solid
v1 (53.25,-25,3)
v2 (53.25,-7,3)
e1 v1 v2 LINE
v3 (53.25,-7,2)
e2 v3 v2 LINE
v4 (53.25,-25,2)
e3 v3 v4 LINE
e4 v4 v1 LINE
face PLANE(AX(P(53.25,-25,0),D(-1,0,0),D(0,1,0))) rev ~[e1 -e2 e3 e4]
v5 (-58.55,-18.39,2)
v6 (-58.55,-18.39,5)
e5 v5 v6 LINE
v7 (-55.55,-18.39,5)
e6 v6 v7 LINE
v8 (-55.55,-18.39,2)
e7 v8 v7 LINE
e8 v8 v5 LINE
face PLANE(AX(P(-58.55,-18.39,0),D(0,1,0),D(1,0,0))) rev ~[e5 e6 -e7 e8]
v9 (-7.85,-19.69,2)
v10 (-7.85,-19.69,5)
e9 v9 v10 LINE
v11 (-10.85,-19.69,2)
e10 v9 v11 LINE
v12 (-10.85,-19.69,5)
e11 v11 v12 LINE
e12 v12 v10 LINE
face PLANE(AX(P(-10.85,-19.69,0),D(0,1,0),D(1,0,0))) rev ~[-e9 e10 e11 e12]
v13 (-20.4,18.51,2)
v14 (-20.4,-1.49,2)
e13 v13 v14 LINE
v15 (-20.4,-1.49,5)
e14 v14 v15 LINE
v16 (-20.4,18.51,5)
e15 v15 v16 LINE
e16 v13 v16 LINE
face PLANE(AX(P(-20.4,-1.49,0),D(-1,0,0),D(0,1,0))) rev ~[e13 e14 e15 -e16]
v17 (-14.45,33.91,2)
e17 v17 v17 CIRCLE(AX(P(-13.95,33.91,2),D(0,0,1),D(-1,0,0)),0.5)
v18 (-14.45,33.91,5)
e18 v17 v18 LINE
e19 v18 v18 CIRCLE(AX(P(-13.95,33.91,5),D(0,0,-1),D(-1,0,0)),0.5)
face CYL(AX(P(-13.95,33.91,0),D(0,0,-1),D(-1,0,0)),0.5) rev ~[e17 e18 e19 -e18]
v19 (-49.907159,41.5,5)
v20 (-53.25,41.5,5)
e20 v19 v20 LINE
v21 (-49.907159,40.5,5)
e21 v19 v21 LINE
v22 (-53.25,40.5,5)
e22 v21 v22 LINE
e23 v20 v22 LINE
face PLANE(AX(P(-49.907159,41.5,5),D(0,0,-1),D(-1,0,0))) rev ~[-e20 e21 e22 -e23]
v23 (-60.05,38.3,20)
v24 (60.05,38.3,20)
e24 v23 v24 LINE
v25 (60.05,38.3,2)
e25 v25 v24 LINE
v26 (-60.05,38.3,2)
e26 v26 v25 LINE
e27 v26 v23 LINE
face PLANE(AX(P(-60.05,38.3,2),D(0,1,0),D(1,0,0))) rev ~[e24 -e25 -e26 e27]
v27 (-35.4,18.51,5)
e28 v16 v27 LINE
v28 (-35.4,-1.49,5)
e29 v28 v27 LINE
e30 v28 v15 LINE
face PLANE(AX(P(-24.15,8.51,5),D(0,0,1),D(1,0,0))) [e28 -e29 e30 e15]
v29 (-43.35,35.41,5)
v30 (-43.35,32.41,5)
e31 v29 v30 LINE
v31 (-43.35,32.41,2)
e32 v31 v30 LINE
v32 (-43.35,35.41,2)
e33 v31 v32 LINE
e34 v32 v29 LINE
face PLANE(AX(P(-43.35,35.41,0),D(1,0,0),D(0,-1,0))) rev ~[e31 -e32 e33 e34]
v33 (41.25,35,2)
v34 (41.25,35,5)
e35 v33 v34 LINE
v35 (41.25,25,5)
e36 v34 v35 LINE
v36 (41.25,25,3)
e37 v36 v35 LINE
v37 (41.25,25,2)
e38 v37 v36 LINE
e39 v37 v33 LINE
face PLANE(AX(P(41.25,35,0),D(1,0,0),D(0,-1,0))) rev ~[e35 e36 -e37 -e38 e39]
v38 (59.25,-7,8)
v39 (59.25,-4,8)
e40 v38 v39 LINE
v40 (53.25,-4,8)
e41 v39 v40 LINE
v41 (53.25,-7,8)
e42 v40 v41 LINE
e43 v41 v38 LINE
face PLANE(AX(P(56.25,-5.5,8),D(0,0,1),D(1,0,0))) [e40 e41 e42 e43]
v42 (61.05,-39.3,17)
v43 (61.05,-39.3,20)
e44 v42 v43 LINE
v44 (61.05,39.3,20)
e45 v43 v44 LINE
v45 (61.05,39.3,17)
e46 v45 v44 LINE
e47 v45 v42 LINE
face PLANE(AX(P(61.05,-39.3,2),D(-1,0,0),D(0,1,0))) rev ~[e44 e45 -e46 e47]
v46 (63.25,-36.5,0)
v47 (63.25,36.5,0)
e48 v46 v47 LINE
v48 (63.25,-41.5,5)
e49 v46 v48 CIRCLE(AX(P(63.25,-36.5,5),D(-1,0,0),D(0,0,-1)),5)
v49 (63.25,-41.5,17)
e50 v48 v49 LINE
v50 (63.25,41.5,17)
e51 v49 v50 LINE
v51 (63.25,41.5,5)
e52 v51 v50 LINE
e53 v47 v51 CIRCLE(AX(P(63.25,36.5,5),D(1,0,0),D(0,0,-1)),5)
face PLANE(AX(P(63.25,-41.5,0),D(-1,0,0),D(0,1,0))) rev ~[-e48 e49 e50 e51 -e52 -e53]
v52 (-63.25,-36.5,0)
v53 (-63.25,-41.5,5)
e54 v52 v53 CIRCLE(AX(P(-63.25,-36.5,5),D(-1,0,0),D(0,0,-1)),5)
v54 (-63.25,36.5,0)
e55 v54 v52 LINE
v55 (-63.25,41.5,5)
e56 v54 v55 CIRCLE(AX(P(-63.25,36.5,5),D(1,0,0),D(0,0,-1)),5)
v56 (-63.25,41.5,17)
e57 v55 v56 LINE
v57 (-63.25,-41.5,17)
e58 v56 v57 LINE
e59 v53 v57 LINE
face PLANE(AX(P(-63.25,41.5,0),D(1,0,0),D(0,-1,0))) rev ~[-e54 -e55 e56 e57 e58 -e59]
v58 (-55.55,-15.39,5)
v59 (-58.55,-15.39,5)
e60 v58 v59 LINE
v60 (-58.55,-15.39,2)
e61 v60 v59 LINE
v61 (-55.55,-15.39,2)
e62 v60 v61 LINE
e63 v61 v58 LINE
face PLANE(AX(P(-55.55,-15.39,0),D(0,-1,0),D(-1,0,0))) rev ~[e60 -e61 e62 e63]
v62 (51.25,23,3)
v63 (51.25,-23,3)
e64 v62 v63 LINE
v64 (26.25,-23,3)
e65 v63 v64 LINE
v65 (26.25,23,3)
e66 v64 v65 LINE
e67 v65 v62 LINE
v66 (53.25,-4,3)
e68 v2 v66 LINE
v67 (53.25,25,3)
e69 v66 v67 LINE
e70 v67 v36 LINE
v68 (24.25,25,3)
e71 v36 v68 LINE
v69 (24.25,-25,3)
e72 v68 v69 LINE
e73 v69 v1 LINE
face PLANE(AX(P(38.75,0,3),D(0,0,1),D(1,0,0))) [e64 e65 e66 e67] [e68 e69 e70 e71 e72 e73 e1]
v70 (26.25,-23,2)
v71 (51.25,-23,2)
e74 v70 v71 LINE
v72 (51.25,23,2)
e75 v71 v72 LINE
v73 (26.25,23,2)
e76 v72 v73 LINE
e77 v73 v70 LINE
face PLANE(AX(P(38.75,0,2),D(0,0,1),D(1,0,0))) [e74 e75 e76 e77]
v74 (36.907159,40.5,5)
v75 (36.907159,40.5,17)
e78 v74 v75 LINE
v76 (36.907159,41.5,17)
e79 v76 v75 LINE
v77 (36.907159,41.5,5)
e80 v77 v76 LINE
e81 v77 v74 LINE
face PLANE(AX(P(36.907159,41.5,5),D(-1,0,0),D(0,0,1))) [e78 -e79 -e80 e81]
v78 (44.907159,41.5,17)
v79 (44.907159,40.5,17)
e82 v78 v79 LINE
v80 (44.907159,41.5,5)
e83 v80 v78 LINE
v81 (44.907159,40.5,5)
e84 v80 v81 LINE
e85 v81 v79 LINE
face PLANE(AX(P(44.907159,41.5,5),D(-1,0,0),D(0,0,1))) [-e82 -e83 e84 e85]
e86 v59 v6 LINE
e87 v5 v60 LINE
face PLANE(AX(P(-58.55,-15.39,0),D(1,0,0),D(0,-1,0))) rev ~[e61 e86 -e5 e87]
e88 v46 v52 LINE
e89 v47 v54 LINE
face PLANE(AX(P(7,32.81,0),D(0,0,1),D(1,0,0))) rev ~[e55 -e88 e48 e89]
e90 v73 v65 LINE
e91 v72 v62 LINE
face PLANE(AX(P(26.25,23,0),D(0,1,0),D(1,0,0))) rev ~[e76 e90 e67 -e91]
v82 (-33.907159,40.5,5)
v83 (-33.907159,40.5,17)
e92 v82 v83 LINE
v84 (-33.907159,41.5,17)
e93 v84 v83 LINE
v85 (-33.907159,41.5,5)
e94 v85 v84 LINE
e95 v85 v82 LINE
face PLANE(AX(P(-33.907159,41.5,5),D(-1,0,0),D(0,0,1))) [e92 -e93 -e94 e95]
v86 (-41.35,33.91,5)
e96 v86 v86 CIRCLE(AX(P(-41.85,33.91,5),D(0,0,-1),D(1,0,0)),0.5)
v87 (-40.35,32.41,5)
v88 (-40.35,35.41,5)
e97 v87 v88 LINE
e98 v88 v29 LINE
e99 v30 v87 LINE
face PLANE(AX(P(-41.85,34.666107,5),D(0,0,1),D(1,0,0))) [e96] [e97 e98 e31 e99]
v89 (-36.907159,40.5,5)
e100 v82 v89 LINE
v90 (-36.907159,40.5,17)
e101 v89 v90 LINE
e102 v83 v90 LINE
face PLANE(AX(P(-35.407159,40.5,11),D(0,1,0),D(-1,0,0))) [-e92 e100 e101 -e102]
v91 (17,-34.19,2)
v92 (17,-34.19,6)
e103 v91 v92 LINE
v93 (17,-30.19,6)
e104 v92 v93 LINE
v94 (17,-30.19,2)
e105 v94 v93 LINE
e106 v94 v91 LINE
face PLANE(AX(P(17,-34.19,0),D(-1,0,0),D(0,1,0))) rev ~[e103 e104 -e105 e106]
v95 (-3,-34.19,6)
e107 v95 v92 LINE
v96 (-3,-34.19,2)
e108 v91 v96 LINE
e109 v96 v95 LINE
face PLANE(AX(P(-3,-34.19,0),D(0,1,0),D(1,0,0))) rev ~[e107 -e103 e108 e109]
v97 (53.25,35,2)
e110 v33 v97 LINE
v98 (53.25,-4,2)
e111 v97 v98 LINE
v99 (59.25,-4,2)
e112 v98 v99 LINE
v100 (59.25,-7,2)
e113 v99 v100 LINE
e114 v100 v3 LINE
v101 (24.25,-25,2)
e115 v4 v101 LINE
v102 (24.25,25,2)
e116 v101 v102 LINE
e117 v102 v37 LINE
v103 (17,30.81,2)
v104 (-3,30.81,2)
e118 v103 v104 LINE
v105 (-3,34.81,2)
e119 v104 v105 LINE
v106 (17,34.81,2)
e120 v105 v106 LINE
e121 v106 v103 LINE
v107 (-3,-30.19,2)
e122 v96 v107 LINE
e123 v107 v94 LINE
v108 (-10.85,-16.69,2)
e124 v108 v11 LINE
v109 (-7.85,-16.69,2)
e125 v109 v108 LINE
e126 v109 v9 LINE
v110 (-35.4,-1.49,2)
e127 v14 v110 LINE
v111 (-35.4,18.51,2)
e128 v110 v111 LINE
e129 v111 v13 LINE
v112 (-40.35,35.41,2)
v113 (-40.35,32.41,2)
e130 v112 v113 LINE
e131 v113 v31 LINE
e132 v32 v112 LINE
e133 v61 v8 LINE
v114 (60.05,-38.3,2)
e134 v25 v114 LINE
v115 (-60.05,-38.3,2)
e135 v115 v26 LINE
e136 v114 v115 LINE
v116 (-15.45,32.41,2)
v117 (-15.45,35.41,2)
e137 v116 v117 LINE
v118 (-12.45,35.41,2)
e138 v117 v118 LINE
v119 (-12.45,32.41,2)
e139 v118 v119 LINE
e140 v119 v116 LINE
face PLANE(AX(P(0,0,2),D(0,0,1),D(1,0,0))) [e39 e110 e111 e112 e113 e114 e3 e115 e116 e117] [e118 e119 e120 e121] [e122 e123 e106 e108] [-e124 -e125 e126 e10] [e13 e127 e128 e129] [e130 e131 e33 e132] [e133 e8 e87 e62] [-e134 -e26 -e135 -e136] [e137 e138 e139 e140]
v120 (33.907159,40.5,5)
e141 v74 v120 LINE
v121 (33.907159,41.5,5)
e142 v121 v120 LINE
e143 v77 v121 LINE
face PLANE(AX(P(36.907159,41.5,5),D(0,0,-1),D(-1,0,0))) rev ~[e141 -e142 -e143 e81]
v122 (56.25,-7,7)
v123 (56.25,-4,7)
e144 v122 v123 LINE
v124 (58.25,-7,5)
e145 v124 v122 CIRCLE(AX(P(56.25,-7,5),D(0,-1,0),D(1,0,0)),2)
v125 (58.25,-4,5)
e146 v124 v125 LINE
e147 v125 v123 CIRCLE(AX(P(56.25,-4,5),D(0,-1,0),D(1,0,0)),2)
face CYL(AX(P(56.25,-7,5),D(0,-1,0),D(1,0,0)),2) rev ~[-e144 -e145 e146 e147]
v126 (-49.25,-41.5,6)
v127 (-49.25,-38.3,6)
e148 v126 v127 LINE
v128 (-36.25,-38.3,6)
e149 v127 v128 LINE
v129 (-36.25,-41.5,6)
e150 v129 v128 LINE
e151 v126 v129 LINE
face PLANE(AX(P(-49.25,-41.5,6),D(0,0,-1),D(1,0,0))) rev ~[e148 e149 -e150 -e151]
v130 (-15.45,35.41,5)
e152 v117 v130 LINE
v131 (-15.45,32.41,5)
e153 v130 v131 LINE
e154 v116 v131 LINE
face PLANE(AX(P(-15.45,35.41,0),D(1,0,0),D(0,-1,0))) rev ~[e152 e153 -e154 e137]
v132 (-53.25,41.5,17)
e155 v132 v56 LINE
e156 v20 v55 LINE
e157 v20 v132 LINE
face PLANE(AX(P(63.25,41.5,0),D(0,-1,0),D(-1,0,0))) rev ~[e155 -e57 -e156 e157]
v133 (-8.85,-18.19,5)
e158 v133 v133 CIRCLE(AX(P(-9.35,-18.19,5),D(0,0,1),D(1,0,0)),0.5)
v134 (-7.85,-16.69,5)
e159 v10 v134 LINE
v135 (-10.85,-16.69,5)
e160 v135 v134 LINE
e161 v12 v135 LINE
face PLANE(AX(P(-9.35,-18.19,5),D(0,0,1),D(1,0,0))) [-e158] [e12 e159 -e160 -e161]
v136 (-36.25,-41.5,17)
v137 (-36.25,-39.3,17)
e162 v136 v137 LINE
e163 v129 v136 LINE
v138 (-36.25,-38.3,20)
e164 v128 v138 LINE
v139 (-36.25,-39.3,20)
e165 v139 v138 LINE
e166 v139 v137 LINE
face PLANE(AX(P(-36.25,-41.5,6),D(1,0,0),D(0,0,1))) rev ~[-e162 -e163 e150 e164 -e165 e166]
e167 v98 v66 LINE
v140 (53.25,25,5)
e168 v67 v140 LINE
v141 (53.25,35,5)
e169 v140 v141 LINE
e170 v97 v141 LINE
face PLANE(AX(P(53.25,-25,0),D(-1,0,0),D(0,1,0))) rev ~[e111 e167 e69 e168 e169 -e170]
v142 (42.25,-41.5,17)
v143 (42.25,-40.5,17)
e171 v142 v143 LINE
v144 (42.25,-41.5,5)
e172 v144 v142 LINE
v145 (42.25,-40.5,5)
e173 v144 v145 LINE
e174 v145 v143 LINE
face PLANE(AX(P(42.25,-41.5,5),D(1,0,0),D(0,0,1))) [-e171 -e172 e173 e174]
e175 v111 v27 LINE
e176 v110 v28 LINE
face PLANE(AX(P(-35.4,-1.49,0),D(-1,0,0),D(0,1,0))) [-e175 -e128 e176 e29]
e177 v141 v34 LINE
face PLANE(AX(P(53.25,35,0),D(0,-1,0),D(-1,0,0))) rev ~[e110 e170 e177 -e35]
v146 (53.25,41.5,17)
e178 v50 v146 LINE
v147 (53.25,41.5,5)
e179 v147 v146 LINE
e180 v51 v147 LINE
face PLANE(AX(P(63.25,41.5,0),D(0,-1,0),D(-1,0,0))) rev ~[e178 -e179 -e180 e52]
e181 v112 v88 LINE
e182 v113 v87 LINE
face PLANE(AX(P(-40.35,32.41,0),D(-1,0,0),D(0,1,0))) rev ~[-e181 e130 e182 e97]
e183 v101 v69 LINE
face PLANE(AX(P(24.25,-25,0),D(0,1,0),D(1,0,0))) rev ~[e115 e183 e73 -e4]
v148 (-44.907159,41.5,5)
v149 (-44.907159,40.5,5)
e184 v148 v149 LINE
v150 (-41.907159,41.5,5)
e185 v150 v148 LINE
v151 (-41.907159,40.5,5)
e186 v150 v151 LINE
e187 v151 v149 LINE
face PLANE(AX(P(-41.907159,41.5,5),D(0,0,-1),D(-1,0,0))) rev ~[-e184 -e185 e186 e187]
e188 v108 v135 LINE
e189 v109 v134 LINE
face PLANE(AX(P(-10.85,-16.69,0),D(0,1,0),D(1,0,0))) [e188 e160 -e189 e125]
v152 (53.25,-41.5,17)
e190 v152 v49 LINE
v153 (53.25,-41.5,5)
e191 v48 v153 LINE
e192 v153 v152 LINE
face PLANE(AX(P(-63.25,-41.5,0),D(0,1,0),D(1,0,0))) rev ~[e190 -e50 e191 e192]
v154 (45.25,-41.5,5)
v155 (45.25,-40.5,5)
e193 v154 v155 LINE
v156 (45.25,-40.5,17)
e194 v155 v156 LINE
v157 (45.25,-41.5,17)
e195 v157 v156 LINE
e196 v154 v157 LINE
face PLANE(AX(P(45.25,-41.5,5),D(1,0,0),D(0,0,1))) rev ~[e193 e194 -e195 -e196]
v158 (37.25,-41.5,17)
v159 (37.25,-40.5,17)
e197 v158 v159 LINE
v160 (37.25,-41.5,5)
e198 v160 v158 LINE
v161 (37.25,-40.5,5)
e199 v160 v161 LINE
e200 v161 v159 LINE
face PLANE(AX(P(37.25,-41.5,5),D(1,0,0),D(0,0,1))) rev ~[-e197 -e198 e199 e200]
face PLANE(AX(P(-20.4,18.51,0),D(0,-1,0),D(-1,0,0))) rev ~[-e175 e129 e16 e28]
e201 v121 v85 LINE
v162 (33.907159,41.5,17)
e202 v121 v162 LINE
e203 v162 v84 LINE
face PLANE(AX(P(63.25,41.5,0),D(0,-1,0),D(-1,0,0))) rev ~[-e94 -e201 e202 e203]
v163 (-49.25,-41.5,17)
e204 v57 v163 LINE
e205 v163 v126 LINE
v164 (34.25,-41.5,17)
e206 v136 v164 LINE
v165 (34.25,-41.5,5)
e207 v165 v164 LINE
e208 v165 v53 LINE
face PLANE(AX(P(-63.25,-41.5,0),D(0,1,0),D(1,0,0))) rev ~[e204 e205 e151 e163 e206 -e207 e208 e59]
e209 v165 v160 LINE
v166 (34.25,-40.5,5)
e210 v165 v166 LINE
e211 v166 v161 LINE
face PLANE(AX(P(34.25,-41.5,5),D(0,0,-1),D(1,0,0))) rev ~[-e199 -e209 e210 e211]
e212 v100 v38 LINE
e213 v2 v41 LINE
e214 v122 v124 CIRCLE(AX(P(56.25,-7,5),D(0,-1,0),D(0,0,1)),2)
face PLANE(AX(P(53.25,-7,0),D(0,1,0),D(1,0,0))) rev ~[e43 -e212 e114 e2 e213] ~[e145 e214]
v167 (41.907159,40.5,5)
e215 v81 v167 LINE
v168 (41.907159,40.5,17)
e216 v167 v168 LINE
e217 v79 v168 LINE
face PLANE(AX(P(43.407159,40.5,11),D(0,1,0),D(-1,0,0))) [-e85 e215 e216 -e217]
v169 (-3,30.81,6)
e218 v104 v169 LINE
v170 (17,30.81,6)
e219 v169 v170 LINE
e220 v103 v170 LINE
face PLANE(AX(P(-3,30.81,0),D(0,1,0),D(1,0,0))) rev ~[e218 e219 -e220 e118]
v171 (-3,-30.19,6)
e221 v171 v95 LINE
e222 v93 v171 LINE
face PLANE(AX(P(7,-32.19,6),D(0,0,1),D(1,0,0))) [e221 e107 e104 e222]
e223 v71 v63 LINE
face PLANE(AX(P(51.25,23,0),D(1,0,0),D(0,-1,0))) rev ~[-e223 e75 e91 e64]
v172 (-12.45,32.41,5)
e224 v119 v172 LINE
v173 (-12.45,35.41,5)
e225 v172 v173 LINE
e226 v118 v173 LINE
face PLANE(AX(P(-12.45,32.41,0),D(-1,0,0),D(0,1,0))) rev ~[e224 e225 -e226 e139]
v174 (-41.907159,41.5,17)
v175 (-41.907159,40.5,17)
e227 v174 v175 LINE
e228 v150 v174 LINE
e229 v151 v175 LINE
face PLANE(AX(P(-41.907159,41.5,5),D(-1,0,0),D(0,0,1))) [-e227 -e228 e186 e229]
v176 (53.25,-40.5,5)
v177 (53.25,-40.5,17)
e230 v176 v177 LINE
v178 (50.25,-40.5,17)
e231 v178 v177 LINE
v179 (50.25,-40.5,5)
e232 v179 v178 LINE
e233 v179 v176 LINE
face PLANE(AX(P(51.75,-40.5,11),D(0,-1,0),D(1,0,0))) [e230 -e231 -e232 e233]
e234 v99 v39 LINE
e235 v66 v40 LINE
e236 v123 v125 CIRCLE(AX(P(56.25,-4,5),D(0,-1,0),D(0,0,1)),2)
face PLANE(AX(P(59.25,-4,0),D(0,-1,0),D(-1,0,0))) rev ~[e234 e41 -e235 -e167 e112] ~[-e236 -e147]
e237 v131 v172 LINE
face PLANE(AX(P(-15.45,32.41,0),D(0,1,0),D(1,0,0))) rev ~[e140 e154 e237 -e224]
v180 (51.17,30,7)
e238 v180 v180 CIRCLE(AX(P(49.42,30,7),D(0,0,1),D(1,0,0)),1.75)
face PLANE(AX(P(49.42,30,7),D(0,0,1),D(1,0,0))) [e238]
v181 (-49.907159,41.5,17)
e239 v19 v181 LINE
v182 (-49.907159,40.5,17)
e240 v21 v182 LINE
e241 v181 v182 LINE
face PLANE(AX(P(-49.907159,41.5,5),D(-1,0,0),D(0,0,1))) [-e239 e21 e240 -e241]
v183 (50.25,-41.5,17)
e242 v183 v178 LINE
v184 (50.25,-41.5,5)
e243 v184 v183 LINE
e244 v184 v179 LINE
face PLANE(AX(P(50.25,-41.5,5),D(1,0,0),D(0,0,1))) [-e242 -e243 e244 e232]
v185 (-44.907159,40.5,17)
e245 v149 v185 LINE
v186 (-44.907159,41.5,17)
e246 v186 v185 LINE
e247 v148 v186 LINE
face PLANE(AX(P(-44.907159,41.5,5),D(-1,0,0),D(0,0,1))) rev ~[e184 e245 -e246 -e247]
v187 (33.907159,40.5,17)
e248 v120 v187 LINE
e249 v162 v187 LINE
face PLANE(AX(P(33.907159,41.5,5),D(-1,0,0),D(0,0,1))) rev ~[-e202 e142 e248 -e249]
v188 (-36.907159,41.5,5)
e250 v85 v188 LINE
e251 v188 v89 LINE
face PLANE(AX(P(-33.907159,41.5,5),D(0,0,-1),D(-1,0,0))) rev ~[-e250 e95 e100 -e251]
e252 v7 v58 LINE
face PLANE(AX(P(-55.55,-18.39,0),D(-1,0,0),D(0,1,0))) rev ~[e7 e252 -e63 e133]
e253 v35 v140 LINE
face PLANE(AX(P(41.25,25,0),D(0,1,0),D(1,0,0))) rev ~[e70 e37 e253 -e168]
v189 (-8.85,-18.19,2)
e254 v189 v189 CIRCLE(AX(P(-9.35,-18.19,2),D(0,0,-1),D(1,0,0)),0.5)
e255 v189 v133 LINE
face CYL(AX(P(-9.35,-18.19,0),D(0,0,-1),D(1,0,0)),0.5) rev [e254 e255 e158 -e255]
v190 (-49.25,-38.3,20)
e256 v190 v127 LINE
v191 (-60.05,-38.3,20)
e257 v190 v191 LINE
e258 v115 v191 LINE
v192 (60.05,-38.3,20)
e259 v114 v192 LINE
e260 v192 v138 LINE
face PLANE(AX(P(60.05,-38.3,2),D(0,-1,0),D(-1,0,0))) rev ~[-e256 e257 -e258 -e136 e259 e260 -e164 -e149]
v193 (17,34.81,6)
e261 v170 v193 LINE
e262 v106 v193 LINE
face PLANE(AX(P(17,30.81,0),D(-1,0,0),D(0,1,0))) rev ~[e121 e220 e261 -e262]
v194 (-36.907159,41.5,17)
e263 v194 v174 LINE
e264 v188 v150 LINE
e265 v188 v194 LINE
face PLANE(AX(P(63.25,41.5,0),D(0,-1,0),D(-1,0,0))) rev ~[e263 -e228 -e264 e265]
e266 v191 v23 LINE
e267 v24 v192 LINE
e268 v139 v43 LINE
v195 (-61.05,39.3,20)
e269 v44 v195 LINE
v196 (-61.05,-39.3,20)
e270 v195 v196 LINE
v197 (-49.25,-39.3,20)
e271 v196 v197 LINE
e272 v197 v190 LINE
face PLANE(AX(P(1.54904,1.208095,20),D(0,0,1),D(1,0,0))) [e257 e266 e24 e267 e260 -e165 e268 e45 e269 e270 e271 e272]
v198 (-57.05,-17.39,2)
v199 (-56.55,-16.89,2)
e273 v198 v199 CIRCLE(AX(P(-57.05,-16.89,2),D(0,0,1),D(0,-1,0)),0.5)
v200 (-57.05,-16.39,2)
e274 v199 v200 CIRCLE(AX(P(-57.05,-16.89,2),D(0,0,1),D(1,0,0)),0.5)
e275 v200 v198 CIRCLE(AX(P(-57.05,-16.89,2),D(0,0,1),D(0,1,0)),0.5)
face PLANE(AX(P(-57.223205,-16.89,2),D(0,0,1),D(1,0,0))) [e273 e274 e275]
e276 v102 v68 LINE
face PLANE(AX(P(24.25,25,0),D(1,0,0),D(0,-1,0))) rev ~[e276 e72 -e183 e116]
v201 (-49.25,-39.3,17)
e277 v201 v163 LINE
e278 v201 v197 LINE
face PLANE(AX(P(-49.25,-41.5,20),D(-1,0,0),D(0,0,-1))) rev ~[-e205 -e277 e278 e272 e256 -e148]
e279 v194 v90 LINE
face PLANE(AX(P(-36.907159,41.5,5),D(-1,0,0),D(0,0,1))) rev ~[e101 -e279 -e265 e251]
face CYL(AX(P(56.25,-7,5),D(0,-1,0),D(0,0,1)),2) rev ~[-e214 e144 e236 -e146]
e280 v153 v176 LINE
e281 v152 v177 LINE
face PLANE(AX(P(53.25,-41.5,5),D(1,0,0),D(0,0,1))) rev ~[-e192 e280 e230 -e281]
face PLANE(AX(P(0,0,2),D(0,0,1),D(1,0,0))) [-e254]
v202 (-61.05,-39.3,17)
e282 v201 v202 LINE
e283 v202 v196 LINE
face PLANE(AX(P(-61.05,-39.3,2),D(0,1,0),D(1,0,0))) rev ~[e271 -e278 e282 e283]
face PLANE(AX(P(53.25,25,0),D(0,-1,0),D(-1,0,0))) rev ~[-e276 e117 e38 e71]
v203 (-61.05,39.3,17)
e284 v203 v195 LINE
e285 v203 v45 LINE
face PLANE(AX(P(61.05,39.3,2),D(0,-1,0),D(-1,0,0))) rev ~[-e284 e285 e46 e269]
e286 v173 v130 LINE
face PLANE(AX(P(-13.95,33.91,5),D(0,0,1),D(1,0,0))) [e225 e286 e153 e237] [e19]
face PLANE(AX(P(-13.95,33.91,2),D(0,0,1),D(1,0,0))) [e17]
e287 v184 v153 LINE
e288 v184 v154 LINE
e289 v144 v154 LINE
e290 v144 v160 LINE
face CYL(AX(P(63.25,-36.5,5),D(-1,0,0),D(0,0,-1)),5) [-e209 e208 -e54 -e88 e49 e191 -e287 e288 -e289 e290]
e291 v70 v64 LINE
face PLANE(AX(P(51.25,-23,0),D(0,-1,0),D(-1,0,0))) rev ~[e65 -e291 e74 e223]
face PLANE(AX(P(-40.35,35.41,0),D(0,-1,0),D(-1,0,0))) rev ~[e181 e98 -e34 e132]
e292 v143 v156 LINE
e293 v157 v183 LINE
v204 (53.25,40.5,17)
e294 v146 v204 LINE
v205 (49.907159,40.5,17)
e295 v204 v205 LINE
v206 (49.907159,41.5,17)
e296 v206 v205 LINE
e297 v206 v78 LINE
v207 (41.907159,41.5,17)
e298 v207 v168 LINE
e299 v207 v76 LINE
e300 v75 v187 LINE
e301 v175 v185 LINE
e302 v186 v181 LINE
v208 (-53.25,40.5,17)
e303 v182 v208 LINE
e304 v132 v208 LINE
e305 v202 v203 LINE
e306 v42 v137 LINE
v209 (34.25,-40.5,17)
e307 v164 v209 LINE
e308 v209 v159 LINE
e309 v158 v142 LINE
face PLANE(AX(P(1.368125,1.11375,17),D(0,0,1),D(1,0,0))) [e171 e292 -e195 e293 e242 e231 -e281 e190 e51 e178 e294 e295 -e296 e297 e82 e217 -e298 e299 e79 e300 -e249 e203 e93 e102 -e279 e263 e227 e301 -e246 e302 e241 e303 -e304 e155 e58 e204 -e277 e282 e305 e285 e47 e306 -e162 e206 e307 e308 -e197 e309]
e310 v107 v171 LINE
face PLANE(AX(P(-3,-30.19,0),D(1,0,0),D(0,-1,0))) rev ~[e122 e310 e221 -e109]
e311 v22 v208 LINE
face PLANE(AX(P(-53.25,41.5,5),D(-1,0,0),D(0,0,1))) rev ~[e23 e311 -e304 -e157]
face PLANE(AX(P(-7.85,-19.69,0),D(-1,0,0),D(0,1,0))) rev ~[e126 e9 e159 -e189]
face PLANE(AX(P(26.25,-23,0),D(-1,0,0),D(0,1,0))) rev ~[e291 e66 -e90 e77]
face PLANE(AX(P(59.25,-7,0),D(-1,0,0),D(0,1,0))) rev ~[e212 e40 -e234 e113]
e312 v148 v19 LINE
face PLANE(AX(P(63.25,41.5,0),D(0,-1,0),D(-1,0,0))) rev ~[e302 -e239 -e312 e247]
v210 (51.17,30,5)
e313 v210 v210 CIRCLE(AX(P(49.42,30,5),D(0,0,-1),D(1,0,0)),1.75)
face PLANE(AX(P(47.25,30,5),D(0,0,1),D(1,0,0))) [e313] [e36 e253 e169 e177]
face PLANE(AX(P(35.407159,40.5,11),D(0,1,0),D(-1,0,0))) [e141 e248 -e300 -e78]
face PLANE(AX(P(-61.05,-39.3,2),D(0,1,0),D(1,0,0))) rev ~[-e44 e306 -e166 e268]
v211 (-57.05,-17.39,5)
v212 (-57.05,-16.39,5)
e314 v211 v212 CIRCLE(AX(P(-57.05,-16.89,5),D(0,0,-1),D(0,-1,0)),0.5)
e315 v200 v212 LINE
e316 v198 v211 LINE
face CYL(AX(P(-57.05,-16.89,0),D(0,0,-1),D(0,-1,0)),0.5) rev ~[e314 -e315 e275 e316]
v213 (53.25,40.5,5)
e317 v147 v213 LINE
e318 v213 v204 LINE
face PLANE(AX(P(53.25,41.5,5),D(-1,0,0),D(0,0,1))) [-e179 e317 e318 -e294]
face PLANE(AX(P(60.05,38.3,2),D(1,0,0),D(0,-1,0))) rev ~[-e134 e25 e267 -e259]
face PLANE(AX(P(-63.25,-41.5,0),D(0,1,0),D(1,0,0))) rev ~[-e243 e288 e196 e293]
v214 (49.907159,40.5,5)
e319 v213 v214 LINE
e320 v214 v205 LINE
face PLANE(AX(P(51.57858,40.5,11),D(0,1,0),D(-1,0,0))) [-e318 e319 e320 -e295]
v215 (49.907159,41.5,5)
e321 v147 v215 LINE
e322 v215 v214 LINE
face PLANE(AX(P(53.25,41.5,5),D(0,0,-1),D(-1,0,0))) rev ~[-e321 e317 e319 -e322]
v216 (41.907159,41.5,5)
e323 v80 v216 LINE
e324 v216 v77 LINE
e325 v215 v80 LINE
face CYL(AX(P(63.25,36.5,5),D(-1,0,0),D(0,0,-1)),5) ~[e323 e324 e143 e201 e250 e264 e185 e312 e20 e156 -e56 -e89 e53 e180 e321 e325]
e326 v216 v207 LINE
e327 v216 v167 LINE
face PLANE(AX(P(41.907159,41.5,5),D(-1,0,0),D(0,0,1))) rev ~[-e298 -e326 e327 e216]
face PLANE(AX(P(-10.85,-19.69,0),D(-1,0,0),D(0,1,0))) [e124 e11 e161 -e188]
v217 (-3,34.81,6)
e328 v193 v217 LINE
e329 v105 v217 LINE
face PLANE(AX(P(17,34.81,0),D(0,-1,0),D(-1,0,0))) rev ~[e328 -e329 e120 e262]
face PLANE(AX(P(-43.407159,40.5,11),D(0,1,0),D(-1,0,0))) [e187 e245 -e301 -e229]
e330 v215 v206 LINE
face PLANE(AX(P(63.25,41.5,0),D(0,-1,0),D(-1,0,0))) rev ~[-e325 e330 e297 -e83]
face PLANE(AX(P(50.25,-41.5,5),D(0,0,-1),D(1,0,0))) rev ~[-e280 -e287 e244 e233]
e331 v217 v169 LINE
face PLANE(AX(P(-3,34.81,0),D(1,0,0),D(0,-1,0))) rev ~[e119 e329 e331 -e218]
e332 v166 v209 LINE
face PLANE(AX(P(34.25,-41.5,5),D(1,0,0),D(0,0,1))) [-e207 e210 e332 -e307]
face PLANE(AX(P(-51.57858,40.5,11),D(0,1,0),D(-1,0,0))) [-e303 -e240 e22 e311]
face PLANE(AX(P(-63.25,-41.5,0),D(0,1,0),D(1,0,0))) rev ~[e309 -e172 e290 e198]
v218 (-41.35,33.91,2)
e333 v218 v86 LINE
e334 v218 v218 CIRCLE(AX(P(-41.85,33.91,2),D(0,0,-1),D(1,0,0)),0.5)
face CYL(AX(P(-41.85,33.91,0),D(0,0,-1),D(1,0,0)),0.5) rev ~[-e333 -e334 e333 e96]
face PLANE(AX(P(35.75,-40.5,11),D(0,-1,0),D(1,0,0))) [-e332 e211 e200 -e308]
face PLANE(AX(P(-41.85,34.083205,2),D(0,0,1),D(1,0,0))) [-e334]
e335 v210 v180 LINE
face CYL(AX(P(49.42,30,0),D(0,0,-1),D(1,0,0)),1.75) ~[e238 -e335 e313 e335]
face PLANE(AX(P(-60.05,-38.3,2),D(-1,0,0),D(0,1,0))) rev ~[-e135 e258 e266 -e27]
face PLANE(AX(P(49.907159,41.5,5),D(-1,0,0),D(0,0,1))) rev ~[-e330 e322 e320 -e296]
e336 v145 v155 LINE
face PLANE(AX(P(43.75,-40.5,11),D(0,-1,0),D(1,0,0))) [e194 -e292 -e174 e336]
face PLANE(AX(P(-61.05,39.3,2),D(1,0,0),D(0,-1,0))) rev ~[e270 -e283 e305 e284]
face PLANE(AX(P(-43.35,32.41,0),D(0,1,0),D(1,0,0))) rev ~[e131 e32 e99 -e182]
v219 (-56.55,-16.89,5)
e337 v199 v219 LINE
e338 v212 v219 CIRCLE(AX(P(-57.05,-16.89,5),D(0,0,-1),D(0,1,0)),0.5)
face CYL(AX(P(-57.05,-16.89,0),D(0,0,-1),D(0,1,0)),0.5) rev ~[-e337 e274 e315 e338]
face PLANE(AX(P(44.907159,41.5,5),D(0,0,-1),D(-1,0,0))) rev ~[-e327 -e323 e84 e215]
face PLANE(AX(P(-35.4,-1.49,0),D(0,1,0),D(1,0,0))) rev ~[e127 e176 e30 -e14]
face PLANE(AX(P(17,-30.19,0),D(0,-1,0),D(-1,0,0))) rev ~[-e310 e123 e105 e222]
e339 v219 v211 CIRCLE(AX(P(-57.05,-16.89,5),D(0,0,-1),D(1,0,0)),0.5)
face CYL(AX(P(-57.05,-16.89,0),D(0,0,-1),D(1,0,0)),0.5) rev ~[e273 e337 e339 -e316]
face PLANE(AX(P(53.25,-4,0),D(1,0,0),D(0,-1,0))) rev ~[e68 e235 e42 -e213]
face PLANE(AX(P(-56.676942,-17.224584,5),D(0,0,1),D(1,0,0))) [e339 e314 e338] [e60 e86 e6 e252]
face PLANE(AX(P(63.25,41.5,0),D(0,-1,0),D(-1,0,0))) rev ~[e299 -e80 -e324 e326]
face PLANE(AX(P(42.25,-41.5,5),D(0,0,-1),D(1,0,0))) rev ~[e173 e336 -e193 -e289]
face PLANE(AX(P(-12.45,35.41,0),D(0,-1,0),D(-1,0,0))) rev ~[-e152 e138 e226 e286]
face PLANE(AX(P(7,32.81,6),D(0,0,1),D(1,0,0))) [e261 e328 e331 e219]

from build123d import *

# Parameters (mm, degrees)
F0_W      = 13
F0_H      = 0.2
F0_H_2    = 2
F1_DEPTH  = 17
F0_W_2    = 3
F0_H_3    = 3
F0_R      = 1.75
F0_H_4    = 1
F0_R_2    = 0.5
F2_DEPTH  = 2
F3_R      = 5
F5_DEPTH  = 3
F6_START  = 2
F6_DEPTH  = 18
F0_W_3    = 7.5
F0_H_5    = 20
F7_DEPTH  = 5
F8_W      = 13
F8_H      = 11
F8_H_2    = 3
F9_DEPTH  = 4
F8_W_2    = 3
F8_H_3    = 12
F10_DEPTH = 1
F4_W      = 3.3428409398
F4_H      = 12
F4_W_2    = 3
F11_DEPTH = 1
F12_DEPTH = 8
F13_DEPTH = 7
F14_DEPTH = 6
F16_DEPTH = 3


# Not quite as in the source:
# - a feature names something its author has since deleted; it is built from what else it names


with BuildPart() as f1:
    # F0 (on Top) → F1 (new body)
    with BuildSketch(Plane.XY):
        Polygon((63.25, -41.5), (63.25, 41.5), (11.25, 41.5), (-63.25, 41.5), (-63.25, -41.5), (-56.25, -41.5), (-56.25, -39.5), (-61.25, -39.5), (-61.25, 39.5), (61.25, 39.5), (61.25, -39.5), (-43.25, -39.5), (-43.25, -41.5), align=None)
        Polygon((-43.25, -39.3), (-43.25, -39.5), (61.25, -39.5), (61.25, 39.5), (-61.25, 39.5), (-61.25, -39.5), (-56.25, -39.5), (-56.25, -39.3), (-61.05, -39.3), (-61.05, 39.3), (61.05, 39.3), (61.05, -39.3), (-2.75, -39.3), align=None)
        with Locations((-49.75, -39.4)):
            Rectangle(F0_W, F0_H)
        with Locations((-49.75, -40.5)):
            Rectangle(F0_W, F0_H_2)
    extrude(amount=F1_DEPTH)

    # F0 (on Top) → F2 (join)
    with BuildSketch(Plane.XY):
        Polygon((-56.25, -38.3), (-43.25, -38.3), (60.05, -38.3), (60.05, 38.3), (-60.05, 38.3), (-60.05, -18.19), (-60.05, -38.3), align=None)
        Polygon((-58.55, -18.39), (-58.55, -18.19), (-58.55, -15.39), (-57.05, -15.39), (-55.55, -15.39), (-55.55, -18.39), align=None, mode=Mode.SUBTRACT)
        with Locations((-9.35, -18.19)):
            Rectangle(F0_W_2, F0_H_3, mode=Mode.SUBTRACT)
        Polygon((17, -30.19), (17, -34.19), (-3, -34.19), (-3, -30.19), (1, -30.19), (15, -30.19), align=None, mode=Mode.SUBTRACT)
        Polygon((-35.4, 18.51), (-27.9, 18.51), (-20.4, 18.51), (-20.4, -1.49), (-27.9, -1.49), (-35.4, -1.49), align=None, mode=Mode.SUBTRACT)
        Polygon((-43.35, 32.41), (-43.35, 33.91), (-43.35, 35.41), (-40.35, 35.41), (-40.35, 33.91), (-40.35, 32.41), align=None, mode=Mode.SUBTRACT)
        Polygon((-15.45, 32.41), (-15.45, 33.91), (-15.45, 35.41), (-12.45, 35.41), (-12.45, 32.41), align=None, mode=Mode.SUBTRACT)
        Polygon((51.25, -25), (24.25, -25), (24.25, 25), (36.25, 25), (41.25, 25), (41.25, 35), (53.25, 35), (53.25, 30), (53.25, 25), (53.25, -4), (57.25, -4), (59.25, -4), (59.25, -7), (57.25, -7), (53.25, -7), (53.25, -25), align=None, mode=Mode.SUBTRACT)
        Polygon((-3, 30.81), (-3, 34.81), (17, 34.81), (17, 30.81), (15, 30.81), (1, 30.81), align=None, mode=Mode.SUBTRACT)
        Polygon((-43.25, -38.3), (-43.25, -39.3), (-2.75, -39.3), (61.05, -39.3), (61.05, 39.3), (-61.05, 39.3), (-61.05, -39.3), (-56.25, -39.3), (-56.25, -38.3), (-60.05, -38.3), (-60.05, -18.19), (-60.05, 38.3), (60.05, 38.3), (60.05, -38.3), align=None)
        Polygon((41.25, 35), (41.25, 25), (51.25, 25), (53.25, 25), (53.25, 30), (53.25, 35), align=None)
        with Locations((49.42, 30)):
            Circle(F0_R, mode=Mode.SUBTRACT)
        Polygon((17, 34.81), (-3, 34.81), (-3, 30.81), (1, 30.81), (15, 30.81), (17, 30.81), align=None)
        with Locations((-49.75, -40.5)):
            Rectangle(F0_W, F0_H_2)
        Polygon((53.25, -4), (53.25, -7), (57.25, -7), (59.25, -7), (59.25, -4), (57.25, -4), align=None)
        with Locations((-49.75, -38.8)):
            Rectangle(F0_W, F0_H_4)
        with Locations((49.42, 30)):
            Circle(F0_R)
        with Locations((-9.35, -18.19)):
            Rectangle(F0_W_2, F0_H_3)
        with Locations((-9.35, -18.19)):
            Circle(F0_R_2, mode=Mode.SUBTRACT)
        with Locations((-49.75, -39.4)):
            Rectangle(F0_W, F0_H)
        with Locations((-9.35, -18.19)):
            Circle(F0_R_2)
    extrude(amount=F2_DEPTH)

    # F3
    f3_edges = [f1.edges().sort_by_distance(p)[0] for p in [
        (0, 41.5, 0),
        (0, -41.5, 0),
    ]]
    fillet(f3_edges, radius=F3_R)



with BuildPart() as f2:
    # F0 (on Top) → F2, piece 2 (new body)
    with BuildSketch(Plane.XY):
        with BuildLine():
            ThreePointArc((-57.05, -16.39), (-57.55, -16.89), (-57.05, -17.39))
            Line((-57.05, -17.39), (-57.05, -16.89))
            Line((-57.05, -16.89), (-57.05, -16.39))
        make_face()
        with BuildLine():
            Line((-57.05, -16.89), (-57.05, -17.39))
            ThreePointArc((-57.05, -17.39), (-56.6964466094, -17.2435533906), (-56.55, -16.89))
            ThreePointArc((-56.55, -16.89), (-56.6964466094, -16.5364466094), (-57.05, -16.39))
            Line((-57.05, -16.39), (-57.05, -16.89))
        make_face()
    extrude(amount=F2_DEPTH)


with BuildPart() as f2b:
    # F0 (on Top) → F2, piece 3 (new body)
    with BuildSketch(Plane.XY):
        with BuildLine():
            ThreePointArc((-13.45, 33.91), (-13.95, 34.41), (-14.45, 33.91))
            ThreePointArc((-14.45, 33.91), (-13.95, 33.41), (-13.45, 33.91))
        make_face()
    extrude(amount=F2_DEPTH)


with BuildPart() as f2c:
    # F0 (on Top) → F2, piece 4 (new body)
    with BuildSketch(Plane.XY):
        with BuildLine():
            ThreePointArc((-41.35, 33.91), (-41.85, 34.41), (-42.35, 33.91))
            Line((-42.35, 33.91), (-41.85, 33.91))
            Line((-41.85, 33.91), (-41.35, 33.91))
        make_face()
        with BuildLine():
            Line((-41.85, 33.91), (-42.35, 33.91))
            ThreePointArc((-42.35, 33.91), (-41.85, 33.41), (-41.35, 33.91))
            Line((-41.35, 33.91), (-41.85, 33.91))
        make_face()
    extrude(amount=F2_DEPTH)


with BuildPart() as f2d:
    # F0 (on Top) → F2, piece 5 (new body)
    with BuildSketch(Plane.XY):
        Polygon((51.25, 23), (26.25, 23), (26.25, -23), (49.25, -23), (51.25, -23), align=None)
    extrude(amount=F2_DEPTH)


with BuildPart() as f1_1:
    add(f1.part)

    add(f2d.part)  # F5 merges F2d
    # F0 (on Top) → F5 (join)
    with BuildSketch(Plane.XY):
        Polygon((24.25, 25), (24.25, -25), (51.25, -25), (53.25, -25), (53.25, -7), (53.25, -4), (53.25, 25), (51.25, 25), (41.25, 25), (36.25, 25), align=None)
        Polygon((26.25, -23), (26.25, 23), (51.25, 23), (51.25, -23), (49.25, -23), align=None, mode=Mode.SUBTRACT)
    extrude(amount=F5_DEPTH)

    # F0 (on Top) → F6 (join)
    with BuildSketch(Plane.XY.offset(F6_START)):
        Polygon((-43.25, -38.3), (-43.25, -39.3), (-2.75, -39.3), (61.05, -39.3), (61.05, 39.3), (-61.05, 39.3), (-61.05, -39.3), (-56.25, -39.3), (-56.25, -38.3), (-60.05, -38.3), (-60.05, -18.19), (-60.05, 38.3), (60.05, 38.3), (60.05, -38.3), align=None)
        with Locations((-49.75, -38.8)):
            Rectangle(F0_W, F0_H_4)
    extrude(amount=F6_DEPTH)


    add(f2.part)  # F7 merges F2

    add(f2b.part)  # F7 merges F2b

    add(f2c.part)  # F7 merges F2c
    # F0 (on Top) → F7 (join)
    with BuildSketch(Plane.XY):
        with Locations((-24.15, 8.51)):
            Rectangle(F0_W_3, F0_H_5)
        with Locations((-31.65, 8.51)):
            Rectangle(F0_W_3, F0_H_5)
        Polygon((41.25, 35), (41.25, 25), (51.25, 25), (53.25, 25), (53.25, 30), (53.25, 35), align=None)
        with Locations((49.42, 30)):
            Circle(F0_R, mode=Mode.SUBTRACT)
        with Locations((49.42, 30)):
            Circle(F0_R)
        Polygon((-15.45, 35.41), (-15.45, 33.91), (-15.45, 32.41), (-12.45, 32.41), (-12.45, 35.41), align=None)
        with BuildLine():
            ThreePointArc((-13.45, 33.91), (-13.95, 33.41), (-14.45, 33.91))
            ThreePointArc((-14.45, 33.91), (-13.95, 34.41), (-13.45, 33.91))
        make_face(mode=Mode.SUBTRACT)
        with Locations((-9.35, -18.19)):
            Rectangle(F0_W_2, F0_H_3)
        with Locations((-9.35, -18.19)):
            Circle(F0_R_2, mode=Mode.SUBTRACT)
        with BuildLine():
            Line((-57.05, -18.19), (-58.55, -18.19))
            Line((-58.55, -18.19), (-58.55, -18.39))
            Line((-58.55, -18.39), (-55.55, -18.39))
            Line((-55.55, -18.39), (-55.55, -15.39))
            Line((-55.55, -15.39), (-57.05, -15.39))
            Line((-57.05, -15.39), (-57.05, -16.39))
            ThreePointArc((-57.05, -16.39), (-56.6964466094, -16.5364466094), (-56.55, -16.89))
            ThreePointArc((-56.55, -16.89), (-56.6964466094, -17.2435533906), (-57.05, -17.39))
            Line((-57.05, -17.39), (-57.05, -18.19))
        make_face()
        with BuildLine():
            Line((-43.35, 35.41), (-43.35, 33.91))
            Line((-43.35, 33.91), (-42.35, 33.91))
            ThreePointArc((-42.35, 33.91), (-41.85, 34.41), (-41.35, 33.91))
            Line((-41.35, 33.91), (-40.35, 33.91))
            Line((-40.35, 33.91), (-40.35, 35.41))
            Line((-40.35, 35.41), (-43.35, 35.41))
        make_face()
        with BuildLine():
            Line((-42.35, 33.91), (-43.35, 33.91))
            Line((-43.35, 33.91), (-43.35, 32.41))
            Line((-43.35, 32.41), (-40.35, 32.41))
            Line((-40.35, 32.41), (-40.35, 33.91))
            Line((-40.35, 33.91), (-41.35, 33.91))
            ThreePointArc((-41.35, 33.91), (-41.85, 33.41), (-42.35, 33.91))
        make_face()
        with BuildLine():
            Line((-58.55, -15.39), (-58.55, -18.19))
            Line((-58.55, -18.19), (-57.05, -18.19))
            Line((-57.05, -18.19), (-57.05, -17.39))
            ThreePointArc((-57.05, -17.39), (-57.55, -16.89), (-57.05, -16.39))
            Line((-57.05, -16.39), (-57.05, -15.39))
            Line((-57.05, -15.39), (-58.55, -15.39))
        make_face()
    extrude(amount=F7_DEPTH)

    # F8 (on face) → F9 (cut)
    with BuildSketch(Plane.XZ.offset(41.5)):
        with Locations((-42.75, 11.5)):
            Rectangle(F8_W, F8_H)
        with Locations((-42.75, 18.5)):
            Rectangle(F8_W, F8_H_2)
    extrude(amount=-F9_DEPTH, mode=Mode.SUBTRACT)

    # F8 (on face) → F10 (cut)
    with BuildSketch(Plane.XZ.offset(41.5)):
        Polygon((-49.25, 20), (-49.25, 17), (-49.25, 6), (-36.25, 6), (-36.25, 20), align=None)
        with Locations((51.75, 11)):
            Rectangle(F8_W_2, F8_H_3)
        with Locations((35.75, 11)):
            Rectangle(F8_W_2, F8_H_3)
        with Locations((43.75, 11)):
            Rectangle(F8_W_2, F8_H_3)
    extrude(amount=-F10_DEPTH, mode=Mode.SUBTRACT)

    # F4 (on face) → F11 (cut)
    with BuildSketch(Plane(origin=(0, 41.5, 0), x_dir=(-1, 0, 0), z_dir=(0, 1, 0))):
        with Locations((-51.5785795301, 11)):
            Rectangle(F4_W, F4_H)
        with Locations((-43.4071590602, 11)):
            Rectangle(F4_W_2, F4_H)
        with Locations((-35.4071590602, 11)):
            Rectangle(F4_W_2, F4_H)
        with Locations((35.4071590602, 11)):
            Rectangle(F4_W_2, F4_H)
        with Locations((43.4071590602, 11)):
            Rectangle(F4_W_2, F4_H)
        with Locations((51.5785795301, 11)):
            Rectangle(F4_W, F4_H)
    extrude(amount=-F11_DEPTH, mode=Mode.SUBTRACT)

    # F0 (on Top) → F12 (join)
    with BuildSketch(Plane.XY):
        Polygon((53.25, -4), (53.25, -7), (57.25, -7), (59.25, -7), (59.25, -4), (57.25, -4), align=None)
    extrude(amount=F12_DEPTH)

    # F0 (on Top) → F13 (join)
    with BuildSketch(Plane.XY):
        with Locations((49.42, 30)):
            Circle(F0_R)
    extrude(amount=F13_DEPTH)

    # F0 (on Top) → F14 (join)
    with BuildSketch(Plane.XY):
        Polygon((17, 34.81), (-3, 34.81), (-3, 30.81), (1, 30.81), (15, 30.81), (17, 30.81), align=None)
        Polygon((-3, -34.19), (17, -34.19), (17, -30.19), (15, -30.19), (1, -30.19), (-3, -30.19), align=None)
    extrude(amount=F14_DEPTH)

    # F15 (on face) → F16 (cut)
    with BuildSketch(Plane.XZ.offset(7)):
        with BuildLine():
            ThreePointArc((56.25, 7), (54.8357864376, 3.5857864376), (58.25, 5))
            ThreePointArc((58.25, 5), (57.6642135624, 6.4142135624), (56.25, 7))
        make_face()
    extrude(amount=-F16_DEPTH, mode=Mode.SUBTRACT)


solid = f1_1.part
